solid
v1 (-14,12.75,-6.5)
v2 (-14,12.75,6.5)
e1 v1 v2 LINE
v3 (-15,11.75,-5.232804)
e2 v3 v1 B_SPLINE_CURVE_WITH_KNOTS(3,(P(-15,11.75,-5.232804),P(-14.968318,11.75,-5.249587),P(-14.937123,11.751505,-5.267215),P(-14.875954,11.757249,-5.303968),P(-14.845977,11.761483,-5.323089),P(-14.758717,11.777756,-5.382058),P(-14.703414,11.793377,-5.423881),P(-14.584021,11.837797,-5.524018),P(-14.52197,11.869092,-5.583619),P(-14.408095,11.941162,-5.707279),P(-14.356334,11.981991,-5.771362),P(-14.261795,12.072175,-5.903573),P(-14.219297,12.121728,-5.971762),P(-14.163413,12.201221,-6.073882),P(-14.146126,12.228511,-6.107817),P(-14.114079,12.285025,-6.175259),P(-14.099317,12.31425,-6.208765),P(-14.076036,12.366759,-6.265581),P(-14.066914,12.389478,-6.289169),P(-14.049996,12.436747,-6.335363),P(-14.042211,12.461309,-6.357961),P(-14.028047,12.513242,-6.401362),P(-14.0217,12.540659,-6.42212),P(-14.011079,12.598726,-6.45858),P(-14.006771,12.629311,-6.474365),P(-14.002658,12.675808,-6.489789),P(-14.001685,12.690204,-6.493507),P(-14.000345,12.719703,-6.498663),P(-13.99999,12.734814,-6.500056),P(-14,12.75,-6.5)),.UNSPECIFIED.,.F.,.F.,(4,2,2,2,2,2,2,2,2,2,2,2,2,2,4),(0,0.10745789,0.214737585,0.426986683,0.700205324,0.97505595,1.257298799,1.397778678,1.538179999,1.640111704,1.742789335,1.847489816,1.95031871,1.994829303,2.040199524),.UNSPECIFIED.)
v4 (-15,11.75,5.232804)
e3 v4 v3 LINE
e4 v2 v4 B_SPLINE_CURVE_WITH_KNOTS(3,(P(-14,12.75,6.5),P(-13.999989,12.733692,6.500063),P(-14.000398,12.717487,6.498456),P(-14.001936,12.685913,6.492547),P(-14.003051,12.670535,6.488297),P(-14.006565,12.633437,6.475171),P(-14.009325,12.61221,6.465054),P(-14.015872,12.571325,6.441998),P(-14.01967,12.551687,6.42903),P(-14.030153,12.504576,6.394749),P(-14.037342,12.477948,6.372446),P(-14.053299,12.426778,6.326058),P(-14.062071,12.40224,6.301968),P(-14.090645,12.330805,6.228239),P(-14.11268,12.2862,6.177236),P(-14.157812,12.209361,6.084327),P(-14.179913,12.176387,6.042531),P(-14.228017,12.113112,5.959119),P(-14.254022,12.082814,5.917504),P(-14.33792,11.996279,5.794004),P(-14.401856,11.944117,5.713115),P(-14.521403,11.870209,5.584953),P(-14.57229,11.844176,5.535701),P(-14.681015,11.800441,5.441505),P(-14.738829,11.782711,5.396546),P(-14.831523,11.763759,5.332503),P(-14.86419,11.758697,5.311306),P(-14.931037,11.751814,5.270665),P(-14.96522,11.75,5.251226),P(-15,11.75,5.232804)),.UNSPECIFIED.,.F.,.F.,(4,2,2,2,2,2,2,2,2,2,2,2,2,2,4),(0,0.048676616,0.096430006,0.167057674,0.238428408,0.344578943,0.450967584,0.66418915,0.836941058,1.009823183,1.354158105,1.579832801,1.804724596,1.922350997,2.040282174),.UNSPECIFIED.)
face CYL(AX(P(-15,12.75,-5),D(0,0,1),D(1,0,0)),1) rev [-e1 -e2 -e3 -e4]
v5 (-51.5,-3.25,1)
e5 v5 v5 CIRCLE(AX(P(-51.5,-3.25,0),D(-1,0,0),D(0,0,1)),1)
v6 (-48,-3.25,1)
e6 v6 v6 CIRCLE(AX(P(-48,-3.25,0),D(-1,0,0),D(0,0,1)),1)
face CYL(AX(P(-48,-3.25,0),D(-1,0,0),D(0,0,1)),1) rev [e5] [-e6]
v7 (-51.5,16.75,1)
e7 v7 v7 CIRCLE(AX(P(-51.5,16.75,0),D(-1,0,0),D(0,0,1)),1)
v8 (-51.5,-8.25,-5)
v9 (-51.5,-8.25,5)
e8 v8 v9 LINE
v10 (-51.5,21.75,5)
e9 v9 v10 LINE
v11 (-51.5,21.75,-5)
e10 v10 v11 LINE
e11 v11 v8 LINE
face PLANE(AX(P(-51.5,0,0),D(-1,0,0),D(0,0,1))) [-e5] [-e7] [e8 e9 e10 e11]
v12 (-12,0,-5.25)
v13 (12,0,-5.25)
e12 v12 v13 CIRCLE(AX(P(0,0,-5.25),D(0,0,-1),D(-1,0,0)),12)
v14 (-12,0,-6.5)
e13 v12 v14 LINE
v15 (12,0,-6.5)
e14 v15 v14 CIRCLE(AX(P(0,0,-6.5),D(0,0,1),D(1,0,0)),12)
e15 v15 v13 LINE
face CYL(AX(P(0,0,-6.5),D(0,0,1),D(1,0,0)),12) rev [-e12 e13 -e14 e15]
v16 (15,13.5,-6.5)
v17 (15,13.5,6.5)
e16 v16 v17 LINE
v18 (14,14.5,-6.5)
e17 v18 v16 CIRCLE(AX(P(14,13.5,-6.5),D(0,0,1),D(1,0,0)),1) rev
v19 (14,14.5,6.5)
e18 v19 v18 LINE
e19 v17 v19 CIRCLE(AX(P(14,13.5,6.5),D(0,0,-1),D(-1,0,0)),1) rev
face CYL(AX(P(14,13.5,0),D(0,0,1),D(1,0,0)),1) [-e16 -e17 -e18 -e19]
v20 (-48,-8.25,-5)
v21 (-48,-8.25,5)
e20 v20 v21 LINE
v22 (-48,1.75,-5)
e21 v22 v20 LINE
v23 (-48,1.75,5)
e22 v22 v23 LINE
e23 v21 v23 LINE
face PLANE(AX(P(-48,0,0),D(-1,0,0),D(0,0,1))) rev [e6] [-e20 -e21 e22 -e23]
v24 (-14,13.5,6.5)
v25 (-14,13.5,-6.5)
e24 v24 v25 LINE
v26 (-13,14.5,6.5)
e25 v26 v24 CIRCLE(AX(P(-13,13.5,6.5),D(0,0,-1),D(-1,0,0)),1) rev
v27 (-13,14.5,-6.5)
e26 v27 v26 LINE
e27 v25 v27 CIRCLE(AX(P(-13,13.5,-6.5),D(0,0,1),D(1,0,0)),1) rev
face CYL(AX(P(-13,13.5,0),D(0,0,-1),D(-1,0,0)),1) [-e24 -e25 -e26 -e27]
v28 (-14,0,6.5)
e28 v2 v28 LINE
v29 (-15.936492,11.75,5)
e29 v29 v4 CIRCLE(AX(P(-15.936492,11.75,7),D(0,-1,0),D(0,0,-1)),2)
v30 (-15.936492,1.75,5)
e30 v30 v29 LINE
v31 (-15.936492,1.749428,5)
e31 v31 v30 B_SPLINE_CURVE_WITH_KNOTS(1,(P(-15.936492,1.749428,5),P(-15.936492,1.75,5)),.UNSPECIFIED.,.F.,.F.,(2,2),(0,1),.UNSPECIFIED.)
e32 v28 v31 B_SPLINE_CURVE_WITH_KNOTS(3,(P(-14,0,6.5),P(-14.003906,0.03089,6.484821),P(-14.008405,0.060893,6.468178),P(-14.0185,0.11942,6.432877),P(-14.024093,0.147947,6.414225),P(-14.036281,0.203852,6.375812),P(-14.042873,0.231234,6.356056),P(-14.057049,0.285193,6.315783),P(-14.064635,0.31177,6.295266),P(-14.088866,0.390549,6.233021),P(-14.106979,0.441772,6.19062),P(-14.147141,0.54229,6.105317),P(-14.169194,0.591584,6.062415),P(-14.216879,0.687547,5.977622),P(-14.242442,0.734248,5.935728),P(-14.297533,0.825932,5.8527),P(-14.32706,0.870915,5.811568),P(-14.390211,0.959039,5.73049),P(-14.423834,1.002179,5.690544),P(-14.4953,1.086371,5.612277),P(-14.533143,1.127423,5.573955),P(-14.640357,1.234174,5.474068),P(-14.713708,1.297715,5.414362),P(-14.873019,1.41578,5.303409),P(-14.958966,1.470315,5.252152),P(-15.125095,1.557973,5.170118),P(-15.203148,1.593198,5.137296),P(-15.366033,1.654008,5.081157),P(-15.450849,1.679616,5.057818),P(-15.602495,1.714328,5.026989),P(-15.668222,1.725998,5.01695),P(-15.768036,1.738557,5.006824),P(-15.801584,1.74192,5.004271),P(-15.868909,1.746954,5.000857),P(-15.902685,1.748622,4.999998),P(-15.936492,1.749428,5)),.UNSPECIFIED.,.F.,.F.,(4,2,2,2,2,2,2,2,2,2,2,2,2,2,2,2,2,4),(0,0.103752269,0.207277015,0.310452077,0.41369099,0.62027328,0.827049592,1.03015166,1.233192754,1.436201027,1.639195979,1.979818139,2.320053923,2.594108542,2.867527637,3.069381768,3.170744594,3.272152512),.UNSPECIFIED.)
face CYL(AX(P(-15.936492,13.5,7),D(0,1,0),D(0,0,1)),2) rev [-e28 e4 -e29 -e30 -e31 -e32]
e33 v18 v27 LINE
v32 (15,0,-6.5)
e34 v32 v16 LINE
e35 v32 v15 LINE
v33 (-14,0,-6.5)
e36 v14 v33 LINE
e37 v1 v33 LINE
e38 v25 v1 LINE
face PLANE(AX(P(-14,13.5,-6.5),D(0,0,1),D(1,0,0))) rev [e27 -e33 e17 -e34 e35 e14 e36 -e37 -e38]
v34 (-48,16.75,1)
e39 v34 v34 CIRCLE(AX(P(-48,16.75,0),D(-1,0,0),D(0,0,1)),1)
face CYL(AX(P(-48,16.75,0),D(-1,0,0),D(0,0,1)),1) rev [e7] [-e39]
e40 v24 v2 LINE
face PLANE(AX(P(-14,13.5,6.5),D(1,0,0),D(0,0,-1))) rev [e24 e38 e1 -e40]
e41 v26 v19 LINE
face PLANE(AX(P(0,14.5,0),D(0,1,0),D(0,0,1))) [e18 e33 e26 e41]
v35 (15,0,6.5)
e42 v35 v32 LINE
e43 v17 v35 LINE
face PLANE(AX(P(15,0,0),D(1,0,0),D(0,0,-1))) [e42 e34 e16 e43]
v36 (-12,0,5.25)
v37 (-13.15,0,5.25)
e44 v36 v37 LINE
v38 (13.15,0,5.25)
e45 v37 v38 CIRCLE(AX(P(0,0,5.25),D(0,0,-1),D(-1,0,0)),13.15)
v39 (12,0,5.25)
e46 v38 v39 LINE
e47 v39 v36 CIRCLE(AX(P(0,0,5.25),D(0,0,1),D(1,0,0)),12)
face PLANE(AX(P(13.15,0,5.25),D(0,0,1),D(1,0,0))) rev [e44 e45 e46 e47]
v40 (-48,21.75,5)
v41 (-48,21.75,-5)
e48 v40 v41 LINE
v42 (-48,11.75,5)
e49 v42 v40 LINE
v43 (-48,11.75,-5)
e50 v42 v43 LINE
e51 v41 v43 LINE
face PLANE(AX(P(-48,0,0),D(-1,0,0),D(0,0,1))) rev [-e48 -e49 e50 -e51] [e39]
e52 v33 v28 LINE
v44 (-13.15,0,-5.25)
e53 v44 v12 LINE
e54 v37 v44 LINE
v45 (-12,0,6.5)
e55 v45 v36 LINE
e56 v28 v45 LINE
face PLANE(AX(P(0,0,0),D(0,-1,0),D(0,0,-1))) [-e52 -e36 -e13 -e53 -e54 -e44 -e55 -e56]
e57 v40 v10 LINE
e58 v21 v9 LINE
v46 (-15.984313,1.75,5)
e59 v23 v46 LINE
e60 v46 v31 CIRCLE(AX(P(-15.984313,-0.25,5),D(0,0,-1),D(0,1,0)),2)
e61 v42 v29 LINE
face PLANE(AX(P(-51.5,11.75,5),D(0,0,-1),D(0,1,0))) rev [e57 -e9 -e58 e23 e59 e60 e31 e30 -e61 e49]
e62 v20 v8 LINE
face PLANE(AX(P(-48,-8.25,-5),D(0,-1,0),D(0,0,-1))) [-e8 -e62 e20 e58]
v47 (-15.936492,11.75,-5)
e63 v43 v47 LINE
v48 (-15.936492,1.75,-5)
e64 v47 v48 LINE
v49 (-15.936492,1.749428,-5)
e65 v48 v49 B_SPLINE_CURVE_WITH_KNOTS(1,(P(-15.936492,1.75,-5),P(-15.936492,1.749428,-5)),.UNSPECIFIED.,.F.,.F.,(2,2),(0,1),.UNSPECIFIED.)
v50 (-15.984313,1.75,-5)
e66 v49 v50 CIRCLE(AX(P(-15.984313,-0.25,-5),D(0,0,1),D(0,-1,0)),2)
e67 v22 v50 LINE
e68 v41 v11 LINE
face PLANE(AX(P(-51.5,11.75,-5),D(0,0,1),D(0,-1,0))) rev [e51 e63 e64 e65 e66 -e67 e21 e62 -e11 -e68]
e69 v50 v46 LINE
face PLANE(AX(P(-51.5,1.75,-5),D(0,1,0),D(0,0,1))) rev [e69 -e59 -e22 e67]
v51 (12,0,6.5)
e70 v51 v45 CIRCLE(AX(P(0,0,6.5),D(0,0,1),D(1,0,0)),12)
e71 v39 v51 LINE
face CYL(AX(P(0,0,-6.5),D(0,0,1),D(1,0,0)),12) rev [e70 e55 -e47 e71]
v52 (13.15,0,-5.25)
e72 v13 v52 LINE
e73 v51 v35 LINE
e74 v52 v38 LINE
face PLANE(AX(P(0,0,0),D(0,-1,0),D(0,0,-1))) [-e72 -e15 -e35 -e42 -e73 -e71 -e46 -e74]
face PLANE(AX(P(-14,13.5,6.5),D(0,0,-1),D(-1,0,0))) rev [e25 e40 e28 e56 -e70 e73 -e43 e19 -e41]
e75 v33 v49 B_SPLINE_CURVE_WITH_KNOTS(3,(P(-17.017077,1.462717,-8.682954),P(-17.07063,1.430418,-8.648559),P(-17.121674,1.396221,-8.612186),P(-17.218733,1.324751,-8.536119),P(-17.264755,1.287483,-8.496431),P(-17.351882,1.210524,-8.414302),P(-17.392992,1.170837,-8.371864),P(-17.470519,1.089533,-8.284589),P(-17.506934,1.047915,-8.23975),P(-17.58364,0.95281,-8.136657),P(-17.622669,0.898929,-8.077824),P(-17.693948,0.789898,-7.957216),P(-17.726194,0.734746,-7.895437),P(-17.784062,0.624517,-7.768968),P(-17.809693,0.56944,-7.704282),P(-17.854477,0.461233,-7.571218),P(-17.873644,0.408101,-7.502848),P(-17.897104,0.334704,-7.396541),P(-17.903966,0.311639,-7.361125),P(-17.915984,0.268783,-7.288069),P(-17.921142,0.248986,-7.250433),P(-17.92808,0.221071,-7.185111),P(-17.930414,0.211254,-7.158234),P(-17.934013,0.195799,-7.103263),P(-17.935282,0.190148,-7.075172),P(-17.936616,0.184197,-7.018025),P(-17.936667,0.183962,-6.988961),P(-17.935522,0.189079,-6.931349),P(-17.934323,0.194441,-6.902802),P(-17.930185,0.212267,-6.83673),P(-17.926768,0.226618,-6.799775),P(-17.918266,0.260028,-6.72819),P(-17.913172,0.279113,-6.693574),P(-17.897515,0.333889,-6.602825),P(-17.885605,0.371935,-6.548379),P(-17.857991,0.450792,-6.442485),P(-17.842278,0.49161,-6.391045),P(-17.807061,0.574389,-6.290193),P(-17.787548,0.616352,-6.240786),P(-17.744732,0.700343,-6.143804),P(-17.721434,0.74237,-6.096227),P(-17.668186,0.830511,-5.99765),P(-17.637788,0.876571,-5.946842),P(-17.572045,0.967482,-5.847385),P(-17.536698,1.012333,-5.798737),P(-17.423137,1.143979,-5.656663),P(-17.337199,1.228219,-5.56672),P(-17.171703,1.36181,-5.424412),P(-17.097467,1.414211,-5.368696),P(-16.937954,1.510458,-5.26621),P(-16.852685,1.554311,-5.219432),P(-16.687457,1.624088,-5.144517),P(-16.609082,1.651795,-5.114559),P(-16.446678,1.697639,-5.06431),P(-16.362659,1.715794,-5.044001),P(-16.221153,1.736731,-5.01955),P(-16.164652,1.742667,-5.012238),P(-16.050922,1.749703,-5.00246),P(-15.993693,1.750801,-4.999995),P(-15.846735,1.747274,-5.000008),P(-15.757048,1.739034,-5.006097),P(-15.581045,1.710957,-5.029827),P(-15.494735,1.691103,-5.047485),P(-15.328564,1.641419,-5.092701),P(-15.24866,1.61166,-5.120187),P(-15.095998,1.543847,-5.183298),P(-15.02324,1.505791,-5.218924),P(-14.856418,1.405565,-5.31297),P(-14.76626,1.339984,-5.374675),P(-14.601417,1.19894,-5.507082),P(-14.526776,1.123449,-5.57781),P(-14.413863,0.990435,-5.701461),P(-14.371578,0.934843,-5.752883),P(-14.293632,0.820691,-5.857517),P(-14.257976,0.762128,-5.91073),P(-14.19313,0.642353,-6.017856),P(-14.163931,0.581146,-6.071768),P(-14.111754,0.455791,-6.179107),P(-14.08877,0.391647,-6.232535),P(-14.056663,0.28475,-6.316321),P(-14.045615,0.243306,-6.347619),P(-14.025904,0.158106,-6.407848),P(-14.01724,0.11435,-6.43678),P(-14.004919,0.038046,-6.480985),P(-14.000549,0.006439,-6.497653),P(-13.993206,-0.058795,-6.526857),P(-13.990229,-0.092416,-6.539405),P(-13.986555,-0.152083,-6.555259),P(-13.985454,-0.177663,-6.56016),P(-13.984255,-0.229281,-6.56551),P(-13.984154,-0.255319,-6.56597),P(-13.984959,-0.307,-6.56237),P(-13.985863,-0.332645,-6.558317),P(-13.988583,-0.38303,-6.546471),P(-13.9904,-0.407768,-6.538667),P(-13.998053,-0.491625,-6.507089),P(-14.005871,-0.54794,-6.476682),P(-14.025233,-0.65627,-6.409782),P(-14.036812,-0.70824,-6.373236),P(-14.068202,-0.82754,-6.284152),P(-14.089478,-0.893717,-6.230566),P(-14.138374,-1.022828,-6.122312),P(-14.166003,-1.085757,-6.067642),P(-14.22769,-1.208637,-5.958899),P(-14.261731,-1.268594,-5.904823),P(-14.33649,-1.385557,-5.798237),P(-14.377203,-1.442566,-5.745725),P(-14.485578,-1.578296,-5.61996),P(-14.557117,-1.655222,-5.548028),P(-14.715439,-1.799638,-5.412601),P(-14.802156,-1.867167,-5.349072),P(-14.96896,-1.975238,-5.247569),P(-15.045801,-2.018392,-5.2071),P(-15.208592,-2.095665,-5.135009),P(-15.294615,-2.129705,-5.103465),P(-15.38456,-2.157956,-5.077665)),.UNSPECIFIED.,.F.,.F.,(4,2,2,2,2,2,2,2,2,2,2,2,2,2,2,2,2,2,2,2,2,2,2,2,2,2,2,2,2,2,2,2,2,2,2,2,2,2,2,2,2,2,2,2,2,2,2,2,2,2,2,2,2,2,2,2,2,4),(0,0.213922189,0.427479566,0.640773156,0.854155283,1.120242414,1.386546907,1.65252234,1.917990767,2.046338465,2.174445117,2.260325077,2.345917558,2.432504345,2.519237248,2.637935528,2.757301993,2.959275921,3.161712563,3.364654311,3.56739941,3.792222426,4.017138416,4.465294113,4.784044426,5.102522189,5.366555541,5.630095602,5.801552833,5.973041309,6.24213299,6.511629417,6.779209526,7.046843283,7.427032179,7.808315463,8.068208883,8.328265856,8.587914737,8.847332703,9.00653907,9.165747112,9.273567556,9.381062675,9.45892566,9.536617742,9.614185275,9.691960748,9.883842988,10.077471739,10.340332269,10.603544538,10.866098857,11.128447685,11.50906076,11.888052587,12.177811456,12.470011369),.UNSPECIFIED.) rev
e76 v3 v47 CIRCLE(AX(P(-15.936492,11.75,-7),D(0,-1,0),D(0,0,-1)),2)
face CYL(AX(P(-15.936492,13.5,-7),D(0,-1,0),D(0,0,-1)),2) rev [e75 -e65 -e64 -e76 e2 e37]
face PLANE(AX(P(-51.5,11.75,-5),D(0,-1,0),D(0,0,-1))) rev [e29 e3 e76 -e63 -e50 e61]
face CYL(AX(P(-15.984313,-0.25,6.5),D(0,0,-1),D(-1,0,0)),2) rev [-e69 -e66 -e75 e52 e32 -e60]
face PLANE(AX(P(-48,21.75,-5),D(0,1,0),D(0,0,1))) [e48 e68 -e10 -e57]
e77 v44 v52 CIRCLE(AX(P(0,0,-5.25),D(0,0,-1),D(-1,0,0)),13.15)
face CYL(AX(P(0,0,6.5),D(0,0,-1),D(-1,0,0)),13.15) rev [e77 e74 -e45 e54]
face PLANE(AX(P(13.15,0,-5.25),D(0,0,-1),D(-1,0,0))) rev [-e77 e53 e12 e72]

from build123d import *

# Parameters (mm, degrees)
SKETCH_5_W          = 28
SKETCH_5_H          = 13
EXTRUDE_4_DEPTH     = 13.5
SKETCH_6_W          = 13.15
SKETCH_6_H          = 10.5
SKETCH_8_R          = 12
CUT_EXTRUDE_1_DEPTH = 13
SKETCH_9_W          = 28
SKETCH_9_H          = 13
EXTRUDE_5_DEPTH     = 1
SKETCH_11_W         = 13
SKETCH_11_H         = 14.5
EXTRUDE_6_DEPTH     = 1
FILLET_1_R          = 1
SKETCH_12_W         = 10
SKETCH_12_H         = 10
EXTRUDE_7_DEPTH     = 37.5
SKETCH_13_W         = 10
SKETCH_13_H         = 30
SKETCH_13_R         = 1
EXTRUDE_8_DEPTH     = 3.5
FILLET_2_R          = 2
FILLET_3_R          = 1


with BuildPart() as part:
    # 스케치5 → 보스-돌출4 (new body)
    with BuildSketch(Plane(origin=(0, 0, 0), x_dir=(1, 0, 0), z_dir=(0, 1, 0))):
        Rectangle(SKETCH_5_W, SKETCH_5_H)
    extrude(amount=EXTRUDE_4_DEPTH)

    # 컷-스윕1: sweep along a path in 스케치7
    with BuildLine(Plane.XY.offset(6.5)) as sweep_1_path:
        CenterArc((0, 0), 13.15, 0, 360)
    # 스케치6 → 컷-스윕1 (sweep, cut)
    with BuildSketch(Plane.XZ):
        with Locations((6.575, 0)):
            Rectangle(SKETCH_6_W, SKETCH_6_H)
    sweep(path=sweep_1_path.line, mode=Mode.SUBTRACT)

    # 스케치8 → 컷-돌출1 (cut)
    with BuildSketch(Plane.XY.offset(6.5)):
        Circle(SKETCH_8_R)
    extrude(amount=-CUT_EXTRUDE_1_DEPTH, mode=Mode.SUBTRACT)

    # 스케치9 → 보스-돌출5 (add)
    with BuildSketch(Plane(origin=(0, 13.5, 0), x_dir=(1, 0, 0), z_dir=(0, 1, 0))):
        Rectangle(SKETCH_9_W, SKETCH_9_H)
    extrude(amount=EXTRUDE_5_DEPTH)

    # 스케치11 → 보스-돌출6 (add)
    with BuildSketch(Plane(origin=(14, 0, 0), x_dir=(0, 0, -1), z_dir=(1, 0, 0))):
        with Locations((0, 7.25)):
            Rectangle(SKETCH_11_W, SKETCH_11_H)
    extrude(amount=EXTRUDE_6_DEPTH)

    # 필렛1
    fillet_1_edges = [part.edges().sort_by_distance(p)[0] for p in [
        (-14, 14.5, 0),
        (15, 14.5, 0),
    ]]
    fillet(fillet_1_edges, radius=FILLET_1_R)

    # 스케치12 → 보스-돌출7 (add)
    with BuildSketch(Plane.ZY.offset(14)):
        with Locations((0, 6.75)):
            Rectangle(SKETCH_12_W, SKETCH_12_H)
    extrude(amount=EXTRUDE_7_DEPTH)

    # 스케치13 → 보스-돌출8 (add)
    with BuildSketch(Plane.ZY.offset(51.5)):
        with Locations((0, 6.75)):
            Rectangle(SKETCH_13_W, SKETCH_13_H)
        with Locations((0, 16.75)):
            Circle(SKETCH_13_R, mode=Mode.SUBTRACT)
        with Locations((0, -3.25)):
            Circle(SKETCH_13_R, mode=Mode.SUBTRACT)
    extrude(amount=-EXTRUDE_8_DEPTH)

    # 필렛2
    # the kernel refuses this fillet: 2 mm, written as the material it adds along each edge
    with BuildSketch(Plane(origin=(-14, 11.75, 5), x_dir=(0, 0, 1), z_dir=(0, -1, 0)), Plane(origin=(-14, 1.75, -5), x_dir=(0, 0, -1), z_dir=(0, 1, 0))) as fillet_2_piece_1:
        with BuildLine():
            CenterArc((2, 1.936491673), FILLET_2_R, 180, 75.522487814)
            Line((0, 1.936491673), (-0.04, 1.936491673))
            Line((-0.04, 1.936491673), (-0.04, 0))
            Line((-0.04, 0), (0, -0.04))
            ThreePointArc((0, -0.04), (0.75, -0.04), (1.49, -0.038729833))
            Line((1.49, -0.038729833), (1.5, 0))
        make_face()
    extrude(amount=10)
    with BuildSketch(Plane(origin=(-14, 1.75, 5), x_dir=(0, -1, 0), z_dir=(0, 0, -1))) as fillet_2_piece_2:
        with BuildLine():
            CenterArc((2, 1.984313483), FILLET_2_R, 180, 82.819244219)
            Line((0, 1.984313483), (-0.04, 1.984313483))
            Line((-0.04, 1.984313483), (-0.04, 0))
            Line((-0.04, 0), (0, -0.04))
            ThreePointArc((0, -0.04), (0.875, -0.04), (1.745, -0.03968627))
            Line((1.745, -0.03968627), (1.75, 0))
        make_face()
    extrude(amount=10)
    with BuildSketch(Plane(origin=(-14, 11.75, 5), x_dir=(0, 0, 1), z_dir=(0, -1, 0))) as fillet_2_piece_3a_section:
        with BuildLine():
            CenterArc((2, 1.936491673), FILLET_2_R, 180, 75.522487814)
            Line((0, 1.936491673), (-0.04, 1.936491673))
            Line((-0.04, 1.936491673), (-0.04, 0))
            Line((-0.04, 0), (0, -0.04))
            ThreePointArc((0, -0.04), (0.75, -0.04), (1.49, -0.038729833))
            Line((1.49, -0.038729833), (1.5, 0))
        make_face()
    fillet_2_piece_3a = extrude(amount=14.841229183, mode=Mode.PRIVATE)
    fillet_2_piece_3a = split(fillet_2_piece_3a, bisect_by=Plane(origin=(-14.456288202, 0, 5.379183511), z_dir=(0, 1, 0)), keep=Keep.TOP, mode=Mode.PRIVATE)
    fillet_2_piece_3a = split(fillet_2_piece_3a, bisect_by=Plane(origin=(-14.456288202, 1.75, 5.379183511), z_dir=(0, -1, 0)), keep=Keep.TOP, mode=Mode.PRIVATE)
    with BuildSketch(Plane(origin=(-14, 1.75, 9.960783708), x_dir=(0, -1, 0), z_dir=(0, 0, -1))) as fillet_2_piece_3b_section:
        with BuildLine():
            CenterArc((2, 1.984313483), FILLET_2_R, 180, 82.819244219)
            Line((0, 1.984313483), (-0.04, 1.984313483))
            Line((-0.04, 1.984313483), (-0.04, 0))
            Line((-0.04, 0), (0, -0.04))
            ThreePointArc((0, -0.04), (0.875, -0.04), (1.745, -0.03968627))
            Line((1.745, -0.03968627), (1.75, 0))
        make_face()
    fillet_2_piece_3b = extrude(amount=14.960783708, mode=Mode.PRIVATE)
    fillet_2_piece_3b = split(fillet_2_piece_3b, bisect_by=Plane(origin=(-14.456897386, 1.324929313, 6.5), z_dir=(0, 0, -1)), keep=Keep.TOP, mode=Mode.PRIVATE)
    fillet_2_piece_3b = split(fillet_2_piece_3b, bisect_by=Plane(origin=(-14.456897386, 1.324929313, 5), z_dir=(0, 0, 1)), keep=Keep.TOP, mode=Mode.PRIVATE)
    fillet_2_piece_3 = fillet_2_piece_3a & fillet_2_piece_3b
    add(fillet_2_piece_3)
    with BuildSketch(Plane(origin=(-14, 1.75, 5), x_dir=(0, -1, 0), z_dir=(0, 0, -1))) as fillet_2_piece_4a_section:
        with BuildLine():
            CenterArc((2, 1.984313483), FILLET_2_R, 180, 82.819244219)
            Line((0, 1.984313483), (-0.04, 1.984313483))
            Line((-0.04, 1.984313483), (-0.04, 0))
            Line((-0.04, 0), (0, -0.04))
            ThreePointArc((0, -0.04), (0.875, -0.04), (1.745, -0.03968627))
            Line((1.745, -0.03968627), (1.75, 0))
        make_face()
    fillet_2_piece_4a = extrude(amount=14.960783708, mode=Mode.PRIVATE)
    fillet_2_piece_4a = split(fillet_2_piece_4a, bisect_by=Plane(origin=(-14.456897386, 1.324929313, -6.5), z_dir=(0, 0, 1)), keep=Keep.TOP, mode=Mode.PRIVATE)
    fillet_2_piece_4a = split(fillet_2_piece_4a, bisect_by=Plane(origin=(-14.456897386, 1.324929313, -5), z_dir=(0, 0, -1)), keep=Keep.TOP, mode=Mode.PRIVATE)
    with BuildSketch(Plane(origin=(-14, -3.091229183, -5), x_dir=(0, 0, -1), z_dir=(0, 1, 0))) as fillet_2_piece_4b_section:
        with BuildLine():
            CenterArc((2, 1.936491673), FILLET_2_R, 180, 75.522487814)
            Line((0, 1.936491673), (-0.04, 1.936491673))
            Line((-0.04, 1.936491673), (-0.04, 0))
            Line((-0.04, 0), (0, -0.04))
            ThreePointArc((0, -0.04), (0.75, -0.04), (1.49, -0.038729833))
            Line((1.49, -0.038729833), (1.5, 0))
        make_face()
    fillet_2_piece_4b = extrude(amount=14.841229183, mode=Mode.PRIVATE)
    fillet_2_piece_4b = split(fillet_2_piece_4b, bisect_by=Plane(origin=(-14.456288202, 0, -5.379183511), z_dir=(0, 1, 0)), keep=Keep.TOP, mode=Mode.PRIVATE)
    fillet_2_piece_4b = split(fillet_2_piece_4b, bisect_by=Plane(origin=(-14.456288202, 1.75, -5.379183511), z_dir=(0, -1, 0)), keep=Keep.TOP, mode=Mode.PRIVATE)
    fillet_2_piece_4 = fillet_2_piece_4a & fillet_2_piece_4b
    add(fillet_2_piece_4)

    # 필렛3
    # the kernel refuses this fillet: 1 mm, written as the material it adds along each edge
    with BuildSketch(Plane(origin=(-14, 11.75, 6.5), x_dir=(0, 1, 0), z_dir=(0, 0, -1))) as fillet_3_piece_1_section:
        with BuildLine():
            CenterArc((FILLET_3_R, -FILLET_3_R), FILLET_3_R, 90, 90)
            Line((0, -FILLET_3_R), (0, 0))
            Line((0, 0), (FILLET_3_R, 0))
        make_face()
    fillet_3_piece_1 = extrude(amount=13, mode=Mode.PRIVATE)
    fillet_3_piece_1 = fillet_3_piece_1 - Plane(origin=(-15.936491673, 11.983902991, -7), x_dir=(0, 0, -1), z_dir=(0, -1, 0)) * Cylinder(2, 30, mode=Mode.PRIVATE)
    fillet_3_piece_1 = fillet_3_piece_1 - Plane(origin=(-15.936491673, 11.983902991, 7), x_dir=(0, 0, 1), z_dir=(0, 1, 0)) * Cylinder(2, 30, mode=Mode.PRIVATE)
    add(fillet_3_piece_1)


solid = part.part
